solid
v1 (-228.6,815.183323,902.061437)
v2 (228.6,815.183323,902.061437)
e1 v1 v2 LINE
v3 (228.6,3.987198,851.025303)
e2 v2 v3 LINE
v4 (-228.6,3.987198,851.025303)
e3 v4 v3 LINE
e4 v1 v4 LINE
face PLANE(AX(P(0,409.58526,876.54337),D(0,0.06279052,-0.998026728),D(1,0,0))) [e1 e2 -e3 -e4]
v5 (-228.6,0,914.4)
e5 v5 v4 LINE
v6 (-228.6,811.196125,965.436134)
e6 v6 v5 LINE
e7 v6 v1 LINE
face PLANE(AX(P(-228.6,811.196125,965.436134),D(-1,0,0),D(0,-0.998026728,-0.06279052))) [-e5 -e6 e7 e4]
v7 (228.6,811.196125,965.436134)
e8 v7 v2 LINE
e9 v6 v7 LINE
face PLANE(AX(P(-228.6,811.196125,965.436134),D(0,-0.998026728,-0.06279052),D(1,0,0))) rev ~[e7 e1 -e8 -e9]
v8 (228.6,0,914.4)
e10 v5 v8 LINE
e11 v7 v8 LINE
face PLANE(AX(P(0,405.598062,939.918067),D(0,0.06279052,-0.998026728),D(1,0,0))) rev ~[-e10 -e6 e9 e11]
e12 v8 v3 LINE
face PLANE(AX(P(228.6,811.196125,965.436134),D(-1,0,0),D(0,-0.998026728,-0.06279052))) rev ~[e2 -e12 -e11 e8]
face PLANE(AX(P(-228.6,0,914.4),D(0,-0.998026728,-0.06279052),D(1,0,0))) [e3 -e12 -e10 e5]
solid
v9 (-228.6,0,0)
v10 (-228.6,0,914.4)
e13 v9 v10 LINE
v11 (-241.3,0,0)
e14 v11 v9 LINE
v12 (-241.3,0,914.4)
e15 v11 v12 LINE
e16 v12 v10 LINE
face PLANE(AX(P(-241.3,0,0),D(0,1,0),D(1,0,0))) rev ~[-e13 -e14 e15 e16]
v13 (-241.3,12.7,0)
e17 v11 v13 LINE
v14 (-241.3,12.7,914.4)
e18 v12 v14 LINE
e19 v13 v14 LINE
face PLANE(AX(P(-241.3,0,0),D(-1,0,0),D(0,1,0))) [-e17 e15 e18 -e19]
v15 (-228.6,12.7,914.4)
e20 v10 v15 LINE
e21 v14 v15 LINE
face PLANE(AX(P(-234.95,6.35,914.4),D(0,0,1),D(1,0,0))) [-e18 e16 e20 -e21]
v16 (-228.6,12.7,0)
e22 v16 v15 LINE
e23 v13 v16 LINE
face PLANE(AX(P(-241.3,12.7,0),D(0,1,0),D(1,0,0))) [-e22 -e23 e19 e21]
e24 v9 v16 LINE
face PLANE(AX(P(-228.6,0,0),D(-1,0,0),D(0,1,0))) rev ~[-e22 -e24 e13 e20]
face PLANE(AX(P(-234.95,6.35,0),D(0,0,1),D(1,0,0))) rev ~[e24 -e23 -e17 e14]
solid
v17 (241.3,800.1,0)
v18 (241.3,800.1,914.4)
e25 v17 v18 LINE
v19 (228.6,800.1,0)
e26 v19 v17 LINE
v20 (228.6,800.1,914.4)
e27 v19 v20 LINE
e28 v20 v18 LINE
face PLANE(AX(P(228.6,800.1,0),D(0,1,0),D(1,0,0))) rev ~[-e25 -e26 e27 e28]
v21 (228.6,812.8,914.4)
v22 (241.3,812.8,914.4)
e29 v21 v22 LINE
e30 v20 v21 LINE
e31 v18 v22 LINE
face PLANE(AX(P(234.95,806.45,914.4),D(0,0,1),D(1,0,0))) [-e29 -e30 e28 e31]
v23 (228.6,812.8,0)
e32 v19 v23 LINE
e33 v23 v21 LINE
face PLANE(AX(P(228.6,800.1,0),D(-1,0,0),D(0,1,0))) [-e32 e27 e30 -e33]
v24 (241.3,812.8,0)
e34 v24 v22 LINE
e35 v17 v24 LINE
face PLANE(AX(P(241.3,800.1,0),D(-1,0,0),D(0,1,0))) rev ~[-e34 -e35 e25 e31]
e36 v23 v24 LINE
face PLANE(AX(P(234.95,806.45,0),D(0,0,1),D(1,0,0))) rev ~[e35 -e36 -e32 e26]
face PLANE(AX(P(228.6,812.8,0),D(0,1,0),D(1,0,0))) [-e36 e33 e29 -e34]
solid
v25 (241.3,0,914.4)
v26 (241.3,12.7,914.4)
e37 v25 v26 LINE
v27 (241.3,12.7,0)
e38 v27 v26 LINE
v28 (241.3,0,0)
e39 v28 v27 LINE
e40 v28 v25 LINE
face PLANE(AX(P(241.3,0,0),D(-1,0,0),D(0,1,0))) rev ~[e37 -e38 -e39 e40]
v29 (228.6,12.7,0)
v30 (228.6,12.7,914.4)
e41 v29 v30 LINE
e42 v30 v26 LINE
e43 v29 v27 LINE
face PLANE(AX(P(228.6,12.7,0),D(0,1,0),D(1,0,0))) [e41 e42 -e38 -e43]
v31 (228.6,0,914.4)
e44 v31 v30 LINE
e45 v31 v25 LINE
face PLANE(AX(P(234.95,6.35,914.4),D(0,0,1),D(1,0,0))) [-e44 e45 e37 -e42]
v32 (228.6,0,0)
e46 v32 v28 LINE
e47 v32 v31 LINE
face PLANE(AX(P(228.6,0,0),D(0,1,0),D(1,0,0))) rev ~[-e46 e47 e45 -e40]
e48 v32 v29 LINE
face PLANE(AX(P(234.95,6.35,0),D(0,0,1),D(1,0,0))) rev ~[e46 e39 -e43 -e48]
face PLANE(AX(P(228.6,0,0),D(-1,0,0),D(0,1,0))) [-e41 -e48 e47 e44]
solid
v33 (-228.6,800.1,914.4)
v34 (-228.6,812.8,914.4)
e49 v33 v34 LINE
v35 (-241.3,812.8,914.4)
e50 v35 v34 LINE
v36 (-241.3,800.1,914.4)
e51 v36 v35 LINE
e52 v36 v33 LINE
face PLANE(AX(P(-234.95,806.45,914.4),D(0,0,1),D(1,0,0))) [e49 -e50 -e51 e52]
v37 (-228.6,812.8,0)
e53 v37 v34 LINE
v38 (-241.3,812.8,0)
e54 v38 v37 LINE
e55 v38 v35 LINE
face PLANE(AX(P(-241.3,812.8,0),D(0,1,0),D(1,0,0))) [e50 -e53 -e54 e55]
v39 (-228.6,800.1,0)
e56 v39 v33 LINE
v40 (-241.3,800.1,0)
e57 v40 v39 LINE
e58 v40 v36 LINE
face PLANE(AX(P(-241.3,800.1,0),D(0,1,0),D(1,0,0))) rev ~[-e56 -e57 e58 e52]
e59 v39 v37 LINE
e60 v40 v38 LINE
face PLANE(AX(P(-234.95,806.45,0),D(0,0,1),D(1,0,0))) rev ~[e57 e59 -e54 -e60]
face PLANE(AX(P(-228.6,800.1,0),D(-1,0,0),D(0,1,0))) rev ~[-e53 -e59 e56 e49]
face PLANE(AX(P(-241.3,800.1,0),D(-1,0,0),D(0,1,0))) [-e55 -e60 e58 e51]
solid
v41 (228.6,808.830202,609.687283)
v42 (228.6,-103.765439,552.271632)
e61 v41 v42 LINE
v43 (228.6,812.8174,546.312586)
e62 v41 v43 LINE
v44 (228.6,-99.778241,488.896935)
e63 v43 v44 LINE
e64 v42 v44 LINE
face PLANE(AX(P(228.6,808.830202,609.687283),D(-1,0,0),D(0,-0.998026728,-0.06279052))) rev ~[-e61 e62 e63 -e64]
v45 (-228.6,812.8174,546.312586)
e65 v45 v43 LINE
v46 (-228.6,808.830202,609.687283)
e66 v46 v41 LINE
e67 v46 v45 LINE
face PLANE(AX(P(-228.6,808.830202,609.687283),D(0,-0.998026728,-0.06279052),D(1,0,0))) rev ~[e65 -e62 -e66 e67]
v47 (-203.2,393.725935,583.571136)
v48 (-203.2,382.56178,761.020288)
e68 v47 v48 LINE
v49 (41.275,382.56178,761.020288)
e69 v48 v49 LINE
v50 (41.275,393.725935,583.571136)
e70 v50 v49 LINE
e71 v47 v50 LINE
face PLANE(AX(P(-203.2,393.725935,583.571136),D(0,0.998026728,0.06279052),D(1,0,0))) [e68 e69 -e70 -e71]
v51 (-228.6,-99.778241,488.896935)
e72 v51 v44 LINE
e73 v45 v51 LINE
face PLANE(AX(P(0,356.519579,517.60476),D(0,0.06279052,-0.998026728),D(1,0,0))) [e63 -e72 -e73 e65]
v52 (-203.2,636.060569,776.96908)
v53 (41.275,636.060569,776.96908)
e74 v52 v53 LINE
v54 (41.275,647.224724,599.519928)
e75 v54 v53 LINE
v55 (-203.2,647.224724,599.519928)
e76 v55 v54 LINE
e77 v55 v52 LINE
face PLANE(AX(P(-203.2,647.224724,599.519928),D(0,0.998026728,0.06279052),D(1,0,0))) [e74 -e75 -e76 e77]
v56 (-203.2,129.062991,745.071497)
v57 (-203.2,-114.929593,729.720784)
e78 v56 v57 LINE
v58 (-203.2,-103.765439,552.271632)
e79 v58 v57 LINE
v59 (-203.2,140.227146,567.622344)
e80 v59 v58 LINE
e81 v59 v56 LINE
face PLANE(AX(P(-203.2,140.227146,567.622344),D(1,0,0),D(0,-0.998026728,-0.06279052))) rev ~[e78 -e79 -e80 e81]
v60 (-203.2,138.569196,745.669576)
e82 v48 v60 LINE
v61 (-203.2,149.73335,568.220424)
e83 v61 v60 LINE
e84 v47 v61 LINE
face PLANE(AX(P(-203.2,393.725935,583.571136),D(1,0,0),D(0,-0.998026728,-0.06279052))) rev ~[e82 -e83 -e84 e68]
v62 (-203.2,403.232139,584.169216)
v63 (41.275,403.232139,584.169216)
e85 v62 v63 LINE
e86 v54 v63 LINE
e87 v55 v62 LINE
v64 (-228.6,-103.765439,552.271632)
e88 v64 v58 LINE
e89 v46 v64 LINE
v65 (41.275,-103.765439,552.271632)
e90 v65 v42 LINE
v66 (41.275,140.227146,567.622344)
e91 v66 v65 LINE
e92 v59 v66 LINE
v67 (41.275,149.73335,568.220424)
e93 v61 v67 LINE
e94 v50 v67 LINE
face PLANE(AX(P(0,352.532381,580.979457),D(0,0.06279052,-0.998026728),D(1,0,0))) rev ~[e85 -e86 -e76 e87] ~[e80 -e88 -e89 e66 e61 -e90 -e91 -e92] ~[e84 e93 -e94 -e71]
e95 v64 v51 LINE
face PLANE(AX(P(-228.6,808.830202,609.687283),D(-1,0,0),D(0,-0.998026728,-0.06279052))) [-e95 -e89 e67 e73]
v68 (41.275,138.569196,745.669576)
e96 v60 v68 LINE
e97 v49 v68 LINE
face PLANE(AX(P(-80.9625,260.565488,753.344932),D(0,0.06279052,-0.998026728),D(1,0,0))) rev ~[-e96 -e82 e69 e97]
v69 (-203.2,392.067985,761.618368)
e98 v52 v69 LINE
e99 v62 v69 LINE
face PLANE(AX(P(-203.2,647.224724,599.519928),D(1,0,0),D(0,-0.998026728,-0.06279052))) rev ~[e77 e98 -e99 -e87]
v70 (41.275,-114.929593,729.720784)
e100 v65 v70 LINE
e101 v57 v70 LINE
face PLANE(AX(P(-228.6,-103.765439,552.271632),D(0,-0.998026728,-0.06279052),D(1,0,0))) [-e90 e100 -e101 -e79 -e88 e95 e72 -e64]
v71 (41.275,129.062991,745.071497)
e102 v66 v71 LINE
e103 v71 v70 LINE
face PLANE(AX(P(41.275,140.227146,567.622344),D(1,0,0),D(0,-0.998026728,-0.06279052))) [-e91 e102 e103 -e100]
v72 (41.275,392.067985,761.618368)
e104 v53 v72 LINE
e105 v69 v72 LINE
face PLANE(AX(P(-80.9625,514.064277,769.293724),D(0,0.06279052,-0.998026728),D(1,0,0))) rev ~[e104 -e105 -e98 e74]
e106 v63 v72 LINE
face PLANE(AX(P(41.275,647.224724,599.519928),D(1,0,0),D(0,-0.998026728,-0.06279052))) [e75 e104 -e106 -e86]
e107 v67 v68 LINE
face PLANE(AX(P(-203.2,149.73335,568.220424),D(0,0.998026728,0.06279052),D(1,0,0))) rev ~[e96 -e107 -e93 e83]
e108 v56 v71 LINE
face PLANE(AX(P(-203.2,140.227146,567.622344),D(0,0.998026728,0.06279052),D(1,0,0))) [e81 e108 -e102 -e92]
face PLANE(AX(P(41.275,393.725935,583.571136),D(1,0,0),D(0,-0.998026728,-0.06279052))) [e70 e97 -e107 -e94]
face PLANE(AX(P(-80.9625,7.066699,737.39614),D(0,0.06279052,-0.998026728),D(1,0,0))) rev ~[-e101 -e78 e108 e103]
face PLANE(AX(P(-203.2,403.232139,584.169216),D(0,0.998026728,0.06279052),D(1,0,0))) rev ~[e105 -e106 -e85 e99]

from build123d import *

# Parameters (mm, degrees)
F2_W      = 12.7
F2_H      = 12.7
F3_DEPTH  = 914.4
F6_W      = 457.2
F6_H      = 914.4
F7_DEPTH  = 63.5
F10_W     = 457.2
F10_H     = 812.8
F11_DEPTH = 63.5
F12_W     = 244.475
F12_H     = 244.475
F13_DEPTH = 177.8


# Not quite as in the source:
# - the program builds the solid bodies; features that only make, move or delete a surface that nothing else refers to are left out


with BuildPart() as f3:
    # F2 (on Top) → F3 (new body, through all)
    with BuildSketch(Plane.XY):
        with Locations((-234.95, 6.35)):
            Rectangle(F2_W, F2_H)
    extrude(amount=F3_DEPTH)


with BuildPart() as f3b:
    # F2 (on Top) → F3, piece 2 (new body, through all)
    with BuildSketch(Plane.XY):
        with Locations((234.95, 6.35)):
            Rectangle(F2_W, F2_H)
    extrude(amount=F3_DEPTH)


with BuildPart() as f3c:
    # F2 (on Top) → F3, piece 3 (new body, through all)
    with BuildSketch(Plane.XY):
        with Locations((234.95, 806.45)):
            Rectangle(F2_W, F2_H)
    extrude(amount=F3_DEPTH)


with BuildPart() as f3d:
    # F2 (on Top) → F3, piece 4 (new body, through all)
    with BuildSketch(Plane.XY):
        with Locations((-234.95, 806.45)):
            Rectangle(F2_W, F2_H)
    extrude(amount=F3_DEPTH)


with BuildPart() as f7:
    # F6 (on face) → F7 (new body)
    with BuildSketch(Plane(origin=(0, -35.0181054579, 556.5968475473), x_dir=(1, 0, 0), z_dir=(0, 0.0627905195, -0.9980267284))):
        with Locations((0, -388.3167412758)):
            Rectangle(F6_W, F6_H)
    extrude(amount=F7_DEPTH)

    # F12 (on face) → F13 (join)
    with BuildSketch(Plane(origin=(0, -35.0181054579, 556.5968475473), x_dir=(1, 0, 0), z_dir=(0, 0.0627905195, -0.9980267284))):
        with Locations((-80.9625, -53.3542412758)):
            Rectangle(F12_W, F12_H)
        with Locations((-80.9625, -307.3542412758)):
            Rectangle(F12_W, F12_H)
        with Locations((-80.9625, -561.3542412758)):
            Rectangle(F12_W, F12_H)
    extrude(amount=-F13_DEPTH)


with BuildPart() as f11:
    # F10 (on face) → F11 (new body)
    with BuildSketch(Plane(origin=(0, -57.3023543856, 910.794841441), x_dir=(1, 0, 0), z_dir=(0, 0.0627905195, -0.9980267284))):
        with Locations((0, -463.8156510576)):
            Rectangle(F10_W, F10_H)
    extrude(amount=F11_DEPTH)


solid = Compound([f3.part, f3b.part, f3c.part, f3d.part, f7.part, f11.part])
